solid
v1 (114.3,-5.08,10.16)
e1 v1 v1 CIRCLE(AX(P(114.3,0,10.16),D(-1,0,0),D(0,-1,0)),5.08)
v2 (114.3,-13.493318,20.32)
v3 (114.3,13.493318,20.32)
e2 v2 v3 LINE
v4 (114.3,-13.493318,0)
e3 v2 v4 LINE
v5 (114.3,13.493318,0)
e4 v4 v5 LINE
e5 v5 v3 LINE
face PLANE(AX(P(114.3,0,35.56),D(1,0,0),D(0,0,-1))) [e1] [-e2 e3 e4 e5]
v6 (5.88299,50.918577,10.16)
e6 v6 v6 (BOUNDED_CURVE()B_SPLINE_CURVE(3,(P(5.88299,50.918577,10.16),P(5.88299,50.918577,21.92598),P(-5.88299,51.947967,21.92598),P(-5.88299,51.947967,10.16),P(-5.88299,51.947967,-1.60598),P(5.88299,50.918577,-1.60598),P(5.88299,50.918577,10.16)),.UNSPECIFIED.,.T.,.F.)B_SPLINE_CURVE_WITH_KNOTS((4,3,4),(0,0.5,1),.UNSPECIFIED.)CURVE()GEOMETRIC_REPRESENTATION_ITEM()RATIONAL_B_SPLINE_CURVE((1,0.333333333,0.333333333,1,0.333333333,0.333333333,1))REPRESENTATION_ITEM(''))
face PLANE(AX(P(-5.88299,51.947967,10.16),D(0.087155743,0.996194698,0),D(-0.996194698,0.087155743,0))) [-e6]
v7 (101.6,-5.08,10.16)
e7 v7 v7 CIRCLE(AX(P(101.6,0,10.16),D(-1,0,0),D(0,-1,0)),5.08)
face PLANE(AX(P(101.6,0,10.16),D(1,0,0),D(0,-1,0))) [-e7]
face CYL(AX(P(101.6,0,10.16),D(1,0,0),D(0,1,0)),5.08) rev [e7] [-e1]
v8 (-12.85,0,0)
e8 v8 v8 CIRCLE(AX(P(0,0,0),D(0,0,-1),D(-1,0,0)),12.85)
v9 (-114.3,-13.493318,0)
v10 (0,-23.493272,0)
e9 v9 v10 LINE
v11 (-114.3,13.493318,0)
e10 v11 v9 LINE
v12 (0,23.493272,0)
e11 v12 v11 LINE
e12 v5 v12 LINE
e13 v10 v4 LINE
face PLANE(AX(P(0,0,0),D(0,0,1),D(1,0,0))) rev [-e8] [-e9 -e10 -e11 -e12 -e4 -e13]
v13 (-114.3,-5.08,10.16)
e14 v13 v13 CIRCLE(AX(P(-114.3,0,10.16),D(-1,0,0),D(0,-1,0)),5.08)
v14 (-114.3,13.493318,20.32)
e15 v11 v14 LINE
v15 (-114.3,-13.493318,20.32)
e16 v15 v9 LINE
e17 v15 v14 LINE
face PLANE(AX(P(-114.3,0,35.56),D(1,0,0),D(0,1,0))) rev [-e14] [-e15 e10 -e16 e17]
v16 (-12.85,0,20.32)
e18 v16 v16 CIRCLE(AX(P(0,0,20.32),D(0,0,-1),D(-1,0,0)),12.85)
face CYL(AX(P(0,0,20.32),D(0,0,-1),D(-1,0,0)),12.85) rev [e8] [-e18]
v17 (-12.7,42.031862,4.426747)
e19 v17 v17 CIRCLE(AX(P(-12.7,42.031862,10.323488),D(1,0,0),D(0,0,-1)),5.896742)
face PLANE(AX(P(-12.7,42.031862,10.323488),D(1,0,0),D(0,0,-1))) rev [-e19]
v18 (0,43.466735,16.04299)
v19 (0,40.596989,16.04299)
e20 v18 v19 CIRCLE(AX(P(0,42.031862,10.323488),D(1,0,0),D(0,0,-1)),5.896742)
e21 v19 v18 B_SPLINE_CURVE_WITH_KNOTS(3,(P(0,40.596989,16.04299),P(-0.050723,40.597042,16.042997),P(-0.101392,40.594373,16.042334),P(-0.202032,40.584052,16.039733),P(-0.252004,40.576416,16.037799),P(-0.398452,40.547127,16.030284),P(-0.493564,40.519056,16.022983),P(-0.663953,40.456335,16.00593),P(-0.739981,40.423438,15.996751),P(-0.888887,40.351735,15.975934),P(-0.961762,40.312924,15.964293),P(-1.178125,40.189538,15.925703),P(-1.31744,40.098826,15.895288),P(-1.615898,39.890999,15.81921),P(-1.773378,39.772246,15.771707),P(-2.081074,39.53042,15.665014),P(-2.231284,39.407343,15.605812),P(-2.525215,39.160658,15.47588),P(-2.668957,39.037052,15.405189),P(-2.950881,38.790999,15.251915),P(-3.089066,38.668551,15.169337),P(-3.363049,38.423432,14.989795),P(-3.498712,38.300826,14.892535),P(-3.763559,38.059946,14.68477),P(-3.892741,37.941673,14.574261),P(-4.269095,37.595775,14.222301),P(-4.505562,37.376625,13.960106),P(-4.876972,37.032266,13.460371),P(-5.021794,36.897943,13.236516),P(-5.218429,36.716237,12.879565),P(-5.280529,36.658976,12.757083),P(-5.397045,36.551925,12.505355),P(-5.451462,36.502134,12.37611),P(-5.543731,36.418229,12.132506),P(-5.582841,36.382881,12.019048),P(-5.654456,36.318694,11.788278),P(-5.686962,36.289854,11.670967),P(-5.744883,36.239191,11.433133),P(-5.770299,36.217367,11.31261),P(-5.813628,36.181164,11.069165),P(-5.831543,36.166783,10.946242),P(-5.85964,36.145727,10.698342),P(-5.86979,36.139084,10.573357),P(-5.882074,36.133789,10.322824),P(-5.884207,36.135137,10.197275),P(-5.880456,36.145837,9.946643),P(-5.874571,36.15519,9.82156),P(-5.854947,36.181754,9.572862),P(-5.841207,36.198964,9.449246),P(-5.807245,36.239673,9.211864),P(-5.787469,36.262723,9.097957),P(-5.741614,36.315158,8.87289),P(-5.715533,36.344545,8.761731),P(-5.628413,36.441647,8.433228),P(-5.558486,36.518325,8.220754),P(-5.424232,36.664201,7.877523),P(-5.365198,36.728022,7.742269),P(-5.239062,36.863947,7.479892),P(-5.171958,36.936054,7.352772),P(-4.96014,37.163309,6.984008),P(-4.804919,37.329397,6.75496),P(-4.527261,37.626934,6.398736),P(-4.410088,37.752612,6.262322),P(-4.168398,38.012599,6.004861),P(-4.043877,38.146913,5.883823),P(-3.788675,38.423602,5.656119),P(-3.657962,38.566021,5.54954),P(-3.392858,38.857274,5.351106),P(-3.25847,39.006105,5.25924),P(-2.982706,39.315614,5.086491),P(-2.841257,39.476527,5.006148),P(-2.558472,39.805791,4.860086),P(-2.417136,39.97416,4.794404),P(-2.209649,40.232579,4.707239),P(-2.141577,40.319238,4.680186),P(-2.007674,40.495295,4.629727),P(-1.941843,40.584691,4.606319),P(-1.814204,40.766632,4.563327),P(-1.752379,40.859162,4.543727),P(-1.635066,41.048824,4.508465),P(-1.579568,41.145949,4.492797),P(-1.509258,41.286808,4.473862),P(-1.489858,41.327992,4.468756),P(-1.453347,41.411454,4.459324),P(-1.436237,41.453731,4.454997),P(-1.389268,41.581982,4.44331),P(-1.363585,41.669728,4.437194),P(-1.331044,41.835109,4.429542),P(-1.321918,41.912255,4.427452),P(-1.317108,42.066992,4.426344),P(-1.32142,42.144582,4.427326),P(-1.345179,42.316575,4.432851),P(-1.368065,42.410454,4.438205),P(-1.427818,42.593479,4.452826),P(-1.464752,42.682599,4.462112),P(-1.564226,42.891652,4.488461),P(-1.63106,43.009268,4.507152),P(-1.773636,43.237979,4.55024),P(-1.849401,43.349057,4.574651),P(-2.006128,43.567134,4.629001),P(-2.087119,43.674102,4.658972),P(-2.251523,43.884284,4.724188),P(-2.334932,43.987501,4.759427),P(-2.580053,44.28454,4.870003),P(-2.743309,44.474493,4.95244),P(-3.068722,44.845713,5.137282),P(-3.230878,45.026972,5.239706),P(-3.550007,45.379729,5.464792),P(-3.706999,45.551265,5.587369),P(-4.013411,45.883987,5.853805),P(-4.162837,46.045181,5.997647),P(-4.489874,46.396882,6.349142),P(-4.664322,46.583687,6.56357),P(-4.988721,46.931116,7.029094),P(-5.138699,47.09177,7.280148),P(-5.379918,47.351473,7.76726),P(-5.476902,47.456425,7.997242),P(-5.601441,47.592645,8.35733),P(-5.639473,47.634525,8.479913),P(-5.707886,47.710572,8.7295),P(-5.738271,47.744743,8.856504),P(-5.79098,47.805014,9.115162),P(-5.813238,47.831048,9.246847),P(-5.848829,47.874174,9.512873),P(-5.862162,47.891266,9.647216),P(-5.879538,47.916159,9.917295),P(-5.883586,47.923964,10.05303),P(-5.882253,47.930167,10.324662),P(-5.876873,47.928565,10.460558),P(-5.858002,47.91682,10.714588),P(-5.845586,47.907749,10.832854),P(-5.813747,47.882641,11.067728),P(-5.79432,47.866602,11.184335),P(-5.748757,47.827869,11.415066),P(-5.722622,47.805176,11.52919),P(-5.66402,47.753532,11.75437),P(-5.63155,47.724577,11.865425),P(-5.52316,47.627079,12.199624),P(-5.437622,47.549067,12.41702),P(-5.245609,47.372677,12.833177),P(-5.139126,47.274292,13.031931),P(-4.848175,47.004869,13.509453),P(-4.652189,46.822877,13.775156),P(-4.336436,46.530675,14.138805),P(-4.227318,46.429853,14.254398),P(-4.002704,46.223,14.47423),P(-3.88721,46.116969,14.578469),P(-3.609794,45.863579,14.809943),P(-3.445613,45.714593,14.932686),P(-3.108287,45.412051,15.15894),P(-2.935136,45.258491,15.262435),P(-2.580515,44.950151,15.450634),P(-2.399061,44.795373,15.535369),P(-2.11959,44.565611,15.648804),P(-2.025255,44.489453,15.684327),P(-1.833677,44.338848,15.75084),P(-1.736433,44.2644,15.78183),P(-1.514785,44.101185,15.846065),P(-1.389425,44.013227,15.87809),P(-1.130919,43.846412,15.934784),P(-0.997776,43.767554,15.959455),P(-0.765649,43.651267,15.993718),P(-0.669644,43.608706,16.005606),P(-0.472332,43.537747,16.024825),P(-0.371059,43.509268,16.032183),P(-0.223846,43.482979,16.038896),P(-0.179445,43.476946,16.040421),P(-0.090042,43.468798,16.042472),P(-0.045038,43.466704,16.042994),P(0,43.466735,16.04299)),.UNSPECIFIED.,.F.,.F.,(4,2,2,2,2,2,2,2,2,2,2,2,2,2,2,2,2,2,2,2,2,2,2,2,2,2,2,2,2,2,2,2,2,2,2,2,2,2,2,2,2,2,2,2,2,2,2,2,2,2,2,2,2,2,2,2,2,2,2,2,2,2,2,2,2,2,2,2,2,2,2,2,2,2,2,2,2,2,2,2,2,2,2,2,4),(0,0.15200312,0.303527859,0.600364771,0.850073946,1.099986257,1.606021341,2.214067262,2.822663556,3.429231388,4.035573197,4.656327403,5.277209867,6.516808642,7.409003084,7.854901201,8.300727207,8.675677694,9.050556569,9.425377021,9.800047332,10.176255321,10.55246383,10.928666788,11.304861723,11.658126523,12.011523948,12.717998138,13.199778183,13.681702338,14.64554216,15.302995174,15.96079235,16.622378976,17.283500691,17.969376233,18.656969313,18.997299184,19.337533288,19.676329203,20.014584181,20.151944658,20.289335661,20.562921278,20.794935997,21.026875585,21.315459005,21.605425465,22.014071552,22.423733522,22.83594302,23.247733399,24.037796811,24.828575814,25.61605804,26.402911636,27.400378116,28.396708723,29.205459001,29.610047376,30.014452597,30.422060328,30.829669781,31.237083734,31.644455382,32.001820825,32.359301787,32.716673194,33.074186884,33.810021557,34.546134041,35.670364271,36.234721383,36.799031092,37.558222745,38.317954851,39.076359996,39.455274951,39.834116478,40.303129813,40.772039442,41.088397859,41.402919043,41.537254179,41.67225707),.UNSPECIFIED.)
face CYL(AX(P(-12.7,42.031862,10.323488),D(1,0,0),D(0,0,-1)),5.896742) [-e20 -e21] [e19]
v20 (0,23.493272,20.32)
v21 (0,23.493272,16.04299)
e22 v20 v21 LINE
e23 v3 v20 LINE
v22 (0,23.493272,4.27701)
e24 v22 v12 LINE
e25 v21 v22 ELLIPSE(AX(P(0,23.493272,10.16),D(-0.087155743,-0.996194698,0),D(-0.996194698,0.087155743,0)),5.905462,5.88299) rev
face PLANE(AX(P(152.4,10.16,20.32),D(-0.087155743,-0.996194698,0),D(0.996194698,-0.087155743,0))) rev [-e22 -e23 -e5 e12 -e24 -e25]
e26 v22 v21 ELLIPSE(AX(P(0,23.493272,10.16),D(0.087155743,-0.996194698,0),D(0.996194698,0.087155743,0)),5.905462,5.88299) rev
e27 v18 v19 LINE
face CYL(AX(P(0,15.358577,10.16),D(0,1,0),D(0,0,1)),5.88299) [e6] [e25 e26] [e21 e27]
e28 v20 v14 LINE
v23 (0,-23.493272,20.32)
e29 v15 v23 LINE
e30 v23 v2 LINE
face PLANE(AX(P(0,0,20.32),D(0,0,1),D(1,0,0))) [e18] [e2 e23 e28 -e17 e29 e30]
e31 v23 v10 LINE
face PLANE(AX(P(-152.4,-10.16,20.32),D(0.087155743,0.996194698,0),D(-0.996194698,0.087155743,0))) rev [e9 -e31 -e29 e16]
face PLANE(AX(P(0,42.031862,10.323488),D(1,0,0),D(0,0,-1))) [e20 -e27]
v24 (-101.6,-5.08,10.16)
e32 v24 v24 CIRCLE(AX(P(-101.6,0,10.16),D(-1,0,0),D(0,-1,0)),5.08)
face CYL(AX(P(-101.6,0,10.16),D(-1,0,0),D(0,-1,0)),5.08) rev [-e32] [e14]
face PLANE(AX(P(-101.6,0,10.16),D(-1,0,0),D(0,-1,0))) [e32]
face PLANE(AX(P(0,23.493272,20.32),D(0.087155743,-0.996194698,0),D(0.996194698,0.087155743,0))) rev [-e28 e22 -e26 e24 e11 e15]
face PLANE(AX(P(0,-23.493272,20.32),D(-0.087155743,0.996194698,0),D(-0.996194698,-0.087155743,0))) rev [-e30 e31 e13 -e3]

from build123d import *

# Parameters (mm, degrees)
BOSS_EXTRUDE1_DEPTH       = 20.32
SKETCH6_R                 = 4
CUT_EXTRUDE3_DEPTH        = 20.32
SKETCH7_R                 = 4
CUT_EXTRUDE4_DEPTH        = 156.533264109
SKETCH2_W                 = 13.462
SKETCH2_H                 = 20.32
CUT_EXTRUDE5_DEPTH        = 25.4
SKETCH3_W                 = 13.462
SKETCH3_H                 = 20.32
CUT_EXTRUDE6_DEPTH        = 25.4
SKETCH8_W                 = 27.94
SKETCH8_H                 = 13.462
CUT_EXTRUDE7_DEPTH        = 12.7
BOSS_EXTRUDE2_START       = 22
BOSS_EXTRUDE2_OUTLINE_R   = 5.882990069
BOSS_EXTRUDE2_DEPTH       = 29.94796736
BOSS_EXTRUDE2_START_2     = 51.237553192
BOSS_EXTRUDE2_2_OUTLINE_W = 15
BOSS_EXTRUDE2_2_OUTLINE_H = 15
BOSS_EXTRUDE2_2_DEPTH     = 1.762446808
SKETCH10_R                = 5.896741512
BOSS_EXTRUDE3_DEPTH       = 12.7
SKETCH11_R                = 12.85
CUT_EXTRUDE8_DEPTH        = 163.287564874
SKETCH12_W                = 70.353248074
SKETCH12_H                = 156.82271979
SKETCH12_W_2              = 82.216902171
CUT_EXTRUDE10_DEPTH       = 35.56
SKETCH13_R                = 5.08
CUT_EXTRUDE11_DEPTH       = 12.7


with BuildPart() as part:
    # Sketch1 → Boss-Extrude1 (new body)
    with BuildSketch(Plane.XY):
        Polygon((-152.4, 10.16), (-152.4, -10.16), (0, -23.493272321), (152.4, -10.16), (152.4, 10.16), (0, 23.493272321), align=None)
    extrude(amount=BOSS_EXTRUDE1_DEPTH)

    # Sketch6 → Cut-Extrude3 (cut)
    with BuildSketch(Plane.XY.offset(20.32)):
        Circle(SKETCH6_R)
    extrude(amount=-CUT_EXTRUDE3_DEPTH, mode=Mode.SUBTRACT)

    # Sketch7 → Cut-Extrude4 (cut, through all)
    with BuildSketch(Plane.XY.offset(20.32)):
        with Locations((-136.525, 0)):
            Circle(SKETCH7_R)
        with Locations((136.525, 0)):
            Circle(SKETCH7_R)
    extrude(amount=-CUT_EXTRUDE4_DEPTH, mode=Mode.SUBTRACT)

    # Sketch2 → Cut-Extrude5 (cut)
    with BuildSketch(Plane.ZY.offset(152.4)):
        with Locations((10.16, 0)):
            Rectangle(SKETCH2_W, SKETCH2_H)
    extrude(amount=-CUT_EXTRUDE5_DEPTH, mode=Mode.SUBTRACT)

    # Sketch3 → Cut-Extrude6 (cut)
    with BuildSketch(Plane(origin=(152.4, 0, 0), x_dir=(0, 0, -1), z_dir=(1, 0, 0))):
        with Locations((-10.16, 0)):
            Rectangle(SKETCH3_W, SKETCH3_H)
    extrude(amount=-CUT_EXTRUDE6_DEPTH, mode=Mode.SUBTRACT)

    # Sketch8 → Cut-Extrude7 (cut, symmetric)
    with BuildSketch(Plane(origin=(0, 0, 0), x_dir=(1, 0, 0), z_dir=(0, 1, 0))):
        with Locations((-138.43, -10.16)):
            Rectangle(SKETCH8_W, SKETCH8_H)
        with Locations((138.43, -10.16)):
            Rectangle(SKETCH8_W, SKETCH8_H)
    extrude(amount=CUT_EXTRUDE7_DEPTH, both=True, mode=Mode.SUBTRACT)

    # Boss-Extrude2: read off the stored shape, not the designer's step
    # Boss-Extrude2 outline → Boss-Extrude2 (add)
    with BuildSketch(Plane(origin=(0, 0, 0), x_dir=(1, 0, 0), z_dir=(0, 1, 0)).offset(BOSS_EXTRUDE2_START)):
        with Locations((0, -10.16)):
            Circle(BOSS_EXTRUDE2_OUTLINE_R)
    extrude(amount=BOSS_EXTRUDE2_DEPTH)

    # Boss-Extrude2 2 outline → Boss-Extrude2 2 (cut)
    with BuildSketch(Plane(origin=(0, 0, 0), x_dir=(0.9961946980917455, -0.08715574274765747, 0), z_dir=(0.08715574274765747, 0.9961946980917457, 0)).offset(BOSS_EXTRUDE2_START_2)):
        with Locations((-4.5, -10.5)):
            Rectangle(BOSS_EXTRUDE2_2_OUTLINE_W, BOSS_EXTRUDE2_2_OUTLINE_H)
    extrude(amount=BOSS_EXTRUDE2_2_DEPTH, mode=Mode.SUBTRACT)

    # Sketch10 → Boss-Extrude3 (add)
    with BuildSketch(Plane(origin=(0, 0, 0), x_dir=(0, 0, -1), z_dir=(1, 0, 0))):
        with Locations((-10.323488307, 42.031861705)):
            Circle(SKETCH10_R)
    extrude(amount=-BOSS_EXTRUDE3_DEPTH)

    # Sketch11 → Cut-Extrude8 (cut, through all)
    with BuildSketch(Plane(origin=(0, 0, 0), x_dir=(-1, 0, 0), z_dir=(0, 0, -1))):
        Circle(SKETCH11_R)
    extrude(amount=-CUT_EXTRUDE8_DEPTH, mode=Mode.SUBTRACT)

    # Sketch12 → Cut-Extrude10 (cut)
    with BuildSketch(Plane.XY):
        with Locations((149.476624037, 0)):
            Rectangle(SKETCH12_W, SKETCH12_H)
        with Locations((-155.408451086, 0)):
            Rectangle(SKETCH12_W_2, SKETCH12_H)
    extrude(amount=CUT_EXTRUDE10_DEPTH, mode=Mode.SUBTRACT)

    # Sketch13 → Cut-Extrude11 (cut)
    with BuildSketch(Plane.ZY.offset(114.3)):
        with Locations(Location((10.16, 0, 0), (0, 0, 270))):
            Circle(SKETCH13_R)
    cut_extrude11 = extrude(amount=-CUT_EXTRUDE11_DEPTH, mode=Mode.SUBTRACT)

    # Mirror1: Cut-Extrude11 across plane
    add(cut_extrude11.mirror(Plane(origin=(0, 0, 0), x_dir=(0, 0, 1), z_dir=(1, 0, 0))), mode=Mode.SUBTRACT)


solid = part.part
